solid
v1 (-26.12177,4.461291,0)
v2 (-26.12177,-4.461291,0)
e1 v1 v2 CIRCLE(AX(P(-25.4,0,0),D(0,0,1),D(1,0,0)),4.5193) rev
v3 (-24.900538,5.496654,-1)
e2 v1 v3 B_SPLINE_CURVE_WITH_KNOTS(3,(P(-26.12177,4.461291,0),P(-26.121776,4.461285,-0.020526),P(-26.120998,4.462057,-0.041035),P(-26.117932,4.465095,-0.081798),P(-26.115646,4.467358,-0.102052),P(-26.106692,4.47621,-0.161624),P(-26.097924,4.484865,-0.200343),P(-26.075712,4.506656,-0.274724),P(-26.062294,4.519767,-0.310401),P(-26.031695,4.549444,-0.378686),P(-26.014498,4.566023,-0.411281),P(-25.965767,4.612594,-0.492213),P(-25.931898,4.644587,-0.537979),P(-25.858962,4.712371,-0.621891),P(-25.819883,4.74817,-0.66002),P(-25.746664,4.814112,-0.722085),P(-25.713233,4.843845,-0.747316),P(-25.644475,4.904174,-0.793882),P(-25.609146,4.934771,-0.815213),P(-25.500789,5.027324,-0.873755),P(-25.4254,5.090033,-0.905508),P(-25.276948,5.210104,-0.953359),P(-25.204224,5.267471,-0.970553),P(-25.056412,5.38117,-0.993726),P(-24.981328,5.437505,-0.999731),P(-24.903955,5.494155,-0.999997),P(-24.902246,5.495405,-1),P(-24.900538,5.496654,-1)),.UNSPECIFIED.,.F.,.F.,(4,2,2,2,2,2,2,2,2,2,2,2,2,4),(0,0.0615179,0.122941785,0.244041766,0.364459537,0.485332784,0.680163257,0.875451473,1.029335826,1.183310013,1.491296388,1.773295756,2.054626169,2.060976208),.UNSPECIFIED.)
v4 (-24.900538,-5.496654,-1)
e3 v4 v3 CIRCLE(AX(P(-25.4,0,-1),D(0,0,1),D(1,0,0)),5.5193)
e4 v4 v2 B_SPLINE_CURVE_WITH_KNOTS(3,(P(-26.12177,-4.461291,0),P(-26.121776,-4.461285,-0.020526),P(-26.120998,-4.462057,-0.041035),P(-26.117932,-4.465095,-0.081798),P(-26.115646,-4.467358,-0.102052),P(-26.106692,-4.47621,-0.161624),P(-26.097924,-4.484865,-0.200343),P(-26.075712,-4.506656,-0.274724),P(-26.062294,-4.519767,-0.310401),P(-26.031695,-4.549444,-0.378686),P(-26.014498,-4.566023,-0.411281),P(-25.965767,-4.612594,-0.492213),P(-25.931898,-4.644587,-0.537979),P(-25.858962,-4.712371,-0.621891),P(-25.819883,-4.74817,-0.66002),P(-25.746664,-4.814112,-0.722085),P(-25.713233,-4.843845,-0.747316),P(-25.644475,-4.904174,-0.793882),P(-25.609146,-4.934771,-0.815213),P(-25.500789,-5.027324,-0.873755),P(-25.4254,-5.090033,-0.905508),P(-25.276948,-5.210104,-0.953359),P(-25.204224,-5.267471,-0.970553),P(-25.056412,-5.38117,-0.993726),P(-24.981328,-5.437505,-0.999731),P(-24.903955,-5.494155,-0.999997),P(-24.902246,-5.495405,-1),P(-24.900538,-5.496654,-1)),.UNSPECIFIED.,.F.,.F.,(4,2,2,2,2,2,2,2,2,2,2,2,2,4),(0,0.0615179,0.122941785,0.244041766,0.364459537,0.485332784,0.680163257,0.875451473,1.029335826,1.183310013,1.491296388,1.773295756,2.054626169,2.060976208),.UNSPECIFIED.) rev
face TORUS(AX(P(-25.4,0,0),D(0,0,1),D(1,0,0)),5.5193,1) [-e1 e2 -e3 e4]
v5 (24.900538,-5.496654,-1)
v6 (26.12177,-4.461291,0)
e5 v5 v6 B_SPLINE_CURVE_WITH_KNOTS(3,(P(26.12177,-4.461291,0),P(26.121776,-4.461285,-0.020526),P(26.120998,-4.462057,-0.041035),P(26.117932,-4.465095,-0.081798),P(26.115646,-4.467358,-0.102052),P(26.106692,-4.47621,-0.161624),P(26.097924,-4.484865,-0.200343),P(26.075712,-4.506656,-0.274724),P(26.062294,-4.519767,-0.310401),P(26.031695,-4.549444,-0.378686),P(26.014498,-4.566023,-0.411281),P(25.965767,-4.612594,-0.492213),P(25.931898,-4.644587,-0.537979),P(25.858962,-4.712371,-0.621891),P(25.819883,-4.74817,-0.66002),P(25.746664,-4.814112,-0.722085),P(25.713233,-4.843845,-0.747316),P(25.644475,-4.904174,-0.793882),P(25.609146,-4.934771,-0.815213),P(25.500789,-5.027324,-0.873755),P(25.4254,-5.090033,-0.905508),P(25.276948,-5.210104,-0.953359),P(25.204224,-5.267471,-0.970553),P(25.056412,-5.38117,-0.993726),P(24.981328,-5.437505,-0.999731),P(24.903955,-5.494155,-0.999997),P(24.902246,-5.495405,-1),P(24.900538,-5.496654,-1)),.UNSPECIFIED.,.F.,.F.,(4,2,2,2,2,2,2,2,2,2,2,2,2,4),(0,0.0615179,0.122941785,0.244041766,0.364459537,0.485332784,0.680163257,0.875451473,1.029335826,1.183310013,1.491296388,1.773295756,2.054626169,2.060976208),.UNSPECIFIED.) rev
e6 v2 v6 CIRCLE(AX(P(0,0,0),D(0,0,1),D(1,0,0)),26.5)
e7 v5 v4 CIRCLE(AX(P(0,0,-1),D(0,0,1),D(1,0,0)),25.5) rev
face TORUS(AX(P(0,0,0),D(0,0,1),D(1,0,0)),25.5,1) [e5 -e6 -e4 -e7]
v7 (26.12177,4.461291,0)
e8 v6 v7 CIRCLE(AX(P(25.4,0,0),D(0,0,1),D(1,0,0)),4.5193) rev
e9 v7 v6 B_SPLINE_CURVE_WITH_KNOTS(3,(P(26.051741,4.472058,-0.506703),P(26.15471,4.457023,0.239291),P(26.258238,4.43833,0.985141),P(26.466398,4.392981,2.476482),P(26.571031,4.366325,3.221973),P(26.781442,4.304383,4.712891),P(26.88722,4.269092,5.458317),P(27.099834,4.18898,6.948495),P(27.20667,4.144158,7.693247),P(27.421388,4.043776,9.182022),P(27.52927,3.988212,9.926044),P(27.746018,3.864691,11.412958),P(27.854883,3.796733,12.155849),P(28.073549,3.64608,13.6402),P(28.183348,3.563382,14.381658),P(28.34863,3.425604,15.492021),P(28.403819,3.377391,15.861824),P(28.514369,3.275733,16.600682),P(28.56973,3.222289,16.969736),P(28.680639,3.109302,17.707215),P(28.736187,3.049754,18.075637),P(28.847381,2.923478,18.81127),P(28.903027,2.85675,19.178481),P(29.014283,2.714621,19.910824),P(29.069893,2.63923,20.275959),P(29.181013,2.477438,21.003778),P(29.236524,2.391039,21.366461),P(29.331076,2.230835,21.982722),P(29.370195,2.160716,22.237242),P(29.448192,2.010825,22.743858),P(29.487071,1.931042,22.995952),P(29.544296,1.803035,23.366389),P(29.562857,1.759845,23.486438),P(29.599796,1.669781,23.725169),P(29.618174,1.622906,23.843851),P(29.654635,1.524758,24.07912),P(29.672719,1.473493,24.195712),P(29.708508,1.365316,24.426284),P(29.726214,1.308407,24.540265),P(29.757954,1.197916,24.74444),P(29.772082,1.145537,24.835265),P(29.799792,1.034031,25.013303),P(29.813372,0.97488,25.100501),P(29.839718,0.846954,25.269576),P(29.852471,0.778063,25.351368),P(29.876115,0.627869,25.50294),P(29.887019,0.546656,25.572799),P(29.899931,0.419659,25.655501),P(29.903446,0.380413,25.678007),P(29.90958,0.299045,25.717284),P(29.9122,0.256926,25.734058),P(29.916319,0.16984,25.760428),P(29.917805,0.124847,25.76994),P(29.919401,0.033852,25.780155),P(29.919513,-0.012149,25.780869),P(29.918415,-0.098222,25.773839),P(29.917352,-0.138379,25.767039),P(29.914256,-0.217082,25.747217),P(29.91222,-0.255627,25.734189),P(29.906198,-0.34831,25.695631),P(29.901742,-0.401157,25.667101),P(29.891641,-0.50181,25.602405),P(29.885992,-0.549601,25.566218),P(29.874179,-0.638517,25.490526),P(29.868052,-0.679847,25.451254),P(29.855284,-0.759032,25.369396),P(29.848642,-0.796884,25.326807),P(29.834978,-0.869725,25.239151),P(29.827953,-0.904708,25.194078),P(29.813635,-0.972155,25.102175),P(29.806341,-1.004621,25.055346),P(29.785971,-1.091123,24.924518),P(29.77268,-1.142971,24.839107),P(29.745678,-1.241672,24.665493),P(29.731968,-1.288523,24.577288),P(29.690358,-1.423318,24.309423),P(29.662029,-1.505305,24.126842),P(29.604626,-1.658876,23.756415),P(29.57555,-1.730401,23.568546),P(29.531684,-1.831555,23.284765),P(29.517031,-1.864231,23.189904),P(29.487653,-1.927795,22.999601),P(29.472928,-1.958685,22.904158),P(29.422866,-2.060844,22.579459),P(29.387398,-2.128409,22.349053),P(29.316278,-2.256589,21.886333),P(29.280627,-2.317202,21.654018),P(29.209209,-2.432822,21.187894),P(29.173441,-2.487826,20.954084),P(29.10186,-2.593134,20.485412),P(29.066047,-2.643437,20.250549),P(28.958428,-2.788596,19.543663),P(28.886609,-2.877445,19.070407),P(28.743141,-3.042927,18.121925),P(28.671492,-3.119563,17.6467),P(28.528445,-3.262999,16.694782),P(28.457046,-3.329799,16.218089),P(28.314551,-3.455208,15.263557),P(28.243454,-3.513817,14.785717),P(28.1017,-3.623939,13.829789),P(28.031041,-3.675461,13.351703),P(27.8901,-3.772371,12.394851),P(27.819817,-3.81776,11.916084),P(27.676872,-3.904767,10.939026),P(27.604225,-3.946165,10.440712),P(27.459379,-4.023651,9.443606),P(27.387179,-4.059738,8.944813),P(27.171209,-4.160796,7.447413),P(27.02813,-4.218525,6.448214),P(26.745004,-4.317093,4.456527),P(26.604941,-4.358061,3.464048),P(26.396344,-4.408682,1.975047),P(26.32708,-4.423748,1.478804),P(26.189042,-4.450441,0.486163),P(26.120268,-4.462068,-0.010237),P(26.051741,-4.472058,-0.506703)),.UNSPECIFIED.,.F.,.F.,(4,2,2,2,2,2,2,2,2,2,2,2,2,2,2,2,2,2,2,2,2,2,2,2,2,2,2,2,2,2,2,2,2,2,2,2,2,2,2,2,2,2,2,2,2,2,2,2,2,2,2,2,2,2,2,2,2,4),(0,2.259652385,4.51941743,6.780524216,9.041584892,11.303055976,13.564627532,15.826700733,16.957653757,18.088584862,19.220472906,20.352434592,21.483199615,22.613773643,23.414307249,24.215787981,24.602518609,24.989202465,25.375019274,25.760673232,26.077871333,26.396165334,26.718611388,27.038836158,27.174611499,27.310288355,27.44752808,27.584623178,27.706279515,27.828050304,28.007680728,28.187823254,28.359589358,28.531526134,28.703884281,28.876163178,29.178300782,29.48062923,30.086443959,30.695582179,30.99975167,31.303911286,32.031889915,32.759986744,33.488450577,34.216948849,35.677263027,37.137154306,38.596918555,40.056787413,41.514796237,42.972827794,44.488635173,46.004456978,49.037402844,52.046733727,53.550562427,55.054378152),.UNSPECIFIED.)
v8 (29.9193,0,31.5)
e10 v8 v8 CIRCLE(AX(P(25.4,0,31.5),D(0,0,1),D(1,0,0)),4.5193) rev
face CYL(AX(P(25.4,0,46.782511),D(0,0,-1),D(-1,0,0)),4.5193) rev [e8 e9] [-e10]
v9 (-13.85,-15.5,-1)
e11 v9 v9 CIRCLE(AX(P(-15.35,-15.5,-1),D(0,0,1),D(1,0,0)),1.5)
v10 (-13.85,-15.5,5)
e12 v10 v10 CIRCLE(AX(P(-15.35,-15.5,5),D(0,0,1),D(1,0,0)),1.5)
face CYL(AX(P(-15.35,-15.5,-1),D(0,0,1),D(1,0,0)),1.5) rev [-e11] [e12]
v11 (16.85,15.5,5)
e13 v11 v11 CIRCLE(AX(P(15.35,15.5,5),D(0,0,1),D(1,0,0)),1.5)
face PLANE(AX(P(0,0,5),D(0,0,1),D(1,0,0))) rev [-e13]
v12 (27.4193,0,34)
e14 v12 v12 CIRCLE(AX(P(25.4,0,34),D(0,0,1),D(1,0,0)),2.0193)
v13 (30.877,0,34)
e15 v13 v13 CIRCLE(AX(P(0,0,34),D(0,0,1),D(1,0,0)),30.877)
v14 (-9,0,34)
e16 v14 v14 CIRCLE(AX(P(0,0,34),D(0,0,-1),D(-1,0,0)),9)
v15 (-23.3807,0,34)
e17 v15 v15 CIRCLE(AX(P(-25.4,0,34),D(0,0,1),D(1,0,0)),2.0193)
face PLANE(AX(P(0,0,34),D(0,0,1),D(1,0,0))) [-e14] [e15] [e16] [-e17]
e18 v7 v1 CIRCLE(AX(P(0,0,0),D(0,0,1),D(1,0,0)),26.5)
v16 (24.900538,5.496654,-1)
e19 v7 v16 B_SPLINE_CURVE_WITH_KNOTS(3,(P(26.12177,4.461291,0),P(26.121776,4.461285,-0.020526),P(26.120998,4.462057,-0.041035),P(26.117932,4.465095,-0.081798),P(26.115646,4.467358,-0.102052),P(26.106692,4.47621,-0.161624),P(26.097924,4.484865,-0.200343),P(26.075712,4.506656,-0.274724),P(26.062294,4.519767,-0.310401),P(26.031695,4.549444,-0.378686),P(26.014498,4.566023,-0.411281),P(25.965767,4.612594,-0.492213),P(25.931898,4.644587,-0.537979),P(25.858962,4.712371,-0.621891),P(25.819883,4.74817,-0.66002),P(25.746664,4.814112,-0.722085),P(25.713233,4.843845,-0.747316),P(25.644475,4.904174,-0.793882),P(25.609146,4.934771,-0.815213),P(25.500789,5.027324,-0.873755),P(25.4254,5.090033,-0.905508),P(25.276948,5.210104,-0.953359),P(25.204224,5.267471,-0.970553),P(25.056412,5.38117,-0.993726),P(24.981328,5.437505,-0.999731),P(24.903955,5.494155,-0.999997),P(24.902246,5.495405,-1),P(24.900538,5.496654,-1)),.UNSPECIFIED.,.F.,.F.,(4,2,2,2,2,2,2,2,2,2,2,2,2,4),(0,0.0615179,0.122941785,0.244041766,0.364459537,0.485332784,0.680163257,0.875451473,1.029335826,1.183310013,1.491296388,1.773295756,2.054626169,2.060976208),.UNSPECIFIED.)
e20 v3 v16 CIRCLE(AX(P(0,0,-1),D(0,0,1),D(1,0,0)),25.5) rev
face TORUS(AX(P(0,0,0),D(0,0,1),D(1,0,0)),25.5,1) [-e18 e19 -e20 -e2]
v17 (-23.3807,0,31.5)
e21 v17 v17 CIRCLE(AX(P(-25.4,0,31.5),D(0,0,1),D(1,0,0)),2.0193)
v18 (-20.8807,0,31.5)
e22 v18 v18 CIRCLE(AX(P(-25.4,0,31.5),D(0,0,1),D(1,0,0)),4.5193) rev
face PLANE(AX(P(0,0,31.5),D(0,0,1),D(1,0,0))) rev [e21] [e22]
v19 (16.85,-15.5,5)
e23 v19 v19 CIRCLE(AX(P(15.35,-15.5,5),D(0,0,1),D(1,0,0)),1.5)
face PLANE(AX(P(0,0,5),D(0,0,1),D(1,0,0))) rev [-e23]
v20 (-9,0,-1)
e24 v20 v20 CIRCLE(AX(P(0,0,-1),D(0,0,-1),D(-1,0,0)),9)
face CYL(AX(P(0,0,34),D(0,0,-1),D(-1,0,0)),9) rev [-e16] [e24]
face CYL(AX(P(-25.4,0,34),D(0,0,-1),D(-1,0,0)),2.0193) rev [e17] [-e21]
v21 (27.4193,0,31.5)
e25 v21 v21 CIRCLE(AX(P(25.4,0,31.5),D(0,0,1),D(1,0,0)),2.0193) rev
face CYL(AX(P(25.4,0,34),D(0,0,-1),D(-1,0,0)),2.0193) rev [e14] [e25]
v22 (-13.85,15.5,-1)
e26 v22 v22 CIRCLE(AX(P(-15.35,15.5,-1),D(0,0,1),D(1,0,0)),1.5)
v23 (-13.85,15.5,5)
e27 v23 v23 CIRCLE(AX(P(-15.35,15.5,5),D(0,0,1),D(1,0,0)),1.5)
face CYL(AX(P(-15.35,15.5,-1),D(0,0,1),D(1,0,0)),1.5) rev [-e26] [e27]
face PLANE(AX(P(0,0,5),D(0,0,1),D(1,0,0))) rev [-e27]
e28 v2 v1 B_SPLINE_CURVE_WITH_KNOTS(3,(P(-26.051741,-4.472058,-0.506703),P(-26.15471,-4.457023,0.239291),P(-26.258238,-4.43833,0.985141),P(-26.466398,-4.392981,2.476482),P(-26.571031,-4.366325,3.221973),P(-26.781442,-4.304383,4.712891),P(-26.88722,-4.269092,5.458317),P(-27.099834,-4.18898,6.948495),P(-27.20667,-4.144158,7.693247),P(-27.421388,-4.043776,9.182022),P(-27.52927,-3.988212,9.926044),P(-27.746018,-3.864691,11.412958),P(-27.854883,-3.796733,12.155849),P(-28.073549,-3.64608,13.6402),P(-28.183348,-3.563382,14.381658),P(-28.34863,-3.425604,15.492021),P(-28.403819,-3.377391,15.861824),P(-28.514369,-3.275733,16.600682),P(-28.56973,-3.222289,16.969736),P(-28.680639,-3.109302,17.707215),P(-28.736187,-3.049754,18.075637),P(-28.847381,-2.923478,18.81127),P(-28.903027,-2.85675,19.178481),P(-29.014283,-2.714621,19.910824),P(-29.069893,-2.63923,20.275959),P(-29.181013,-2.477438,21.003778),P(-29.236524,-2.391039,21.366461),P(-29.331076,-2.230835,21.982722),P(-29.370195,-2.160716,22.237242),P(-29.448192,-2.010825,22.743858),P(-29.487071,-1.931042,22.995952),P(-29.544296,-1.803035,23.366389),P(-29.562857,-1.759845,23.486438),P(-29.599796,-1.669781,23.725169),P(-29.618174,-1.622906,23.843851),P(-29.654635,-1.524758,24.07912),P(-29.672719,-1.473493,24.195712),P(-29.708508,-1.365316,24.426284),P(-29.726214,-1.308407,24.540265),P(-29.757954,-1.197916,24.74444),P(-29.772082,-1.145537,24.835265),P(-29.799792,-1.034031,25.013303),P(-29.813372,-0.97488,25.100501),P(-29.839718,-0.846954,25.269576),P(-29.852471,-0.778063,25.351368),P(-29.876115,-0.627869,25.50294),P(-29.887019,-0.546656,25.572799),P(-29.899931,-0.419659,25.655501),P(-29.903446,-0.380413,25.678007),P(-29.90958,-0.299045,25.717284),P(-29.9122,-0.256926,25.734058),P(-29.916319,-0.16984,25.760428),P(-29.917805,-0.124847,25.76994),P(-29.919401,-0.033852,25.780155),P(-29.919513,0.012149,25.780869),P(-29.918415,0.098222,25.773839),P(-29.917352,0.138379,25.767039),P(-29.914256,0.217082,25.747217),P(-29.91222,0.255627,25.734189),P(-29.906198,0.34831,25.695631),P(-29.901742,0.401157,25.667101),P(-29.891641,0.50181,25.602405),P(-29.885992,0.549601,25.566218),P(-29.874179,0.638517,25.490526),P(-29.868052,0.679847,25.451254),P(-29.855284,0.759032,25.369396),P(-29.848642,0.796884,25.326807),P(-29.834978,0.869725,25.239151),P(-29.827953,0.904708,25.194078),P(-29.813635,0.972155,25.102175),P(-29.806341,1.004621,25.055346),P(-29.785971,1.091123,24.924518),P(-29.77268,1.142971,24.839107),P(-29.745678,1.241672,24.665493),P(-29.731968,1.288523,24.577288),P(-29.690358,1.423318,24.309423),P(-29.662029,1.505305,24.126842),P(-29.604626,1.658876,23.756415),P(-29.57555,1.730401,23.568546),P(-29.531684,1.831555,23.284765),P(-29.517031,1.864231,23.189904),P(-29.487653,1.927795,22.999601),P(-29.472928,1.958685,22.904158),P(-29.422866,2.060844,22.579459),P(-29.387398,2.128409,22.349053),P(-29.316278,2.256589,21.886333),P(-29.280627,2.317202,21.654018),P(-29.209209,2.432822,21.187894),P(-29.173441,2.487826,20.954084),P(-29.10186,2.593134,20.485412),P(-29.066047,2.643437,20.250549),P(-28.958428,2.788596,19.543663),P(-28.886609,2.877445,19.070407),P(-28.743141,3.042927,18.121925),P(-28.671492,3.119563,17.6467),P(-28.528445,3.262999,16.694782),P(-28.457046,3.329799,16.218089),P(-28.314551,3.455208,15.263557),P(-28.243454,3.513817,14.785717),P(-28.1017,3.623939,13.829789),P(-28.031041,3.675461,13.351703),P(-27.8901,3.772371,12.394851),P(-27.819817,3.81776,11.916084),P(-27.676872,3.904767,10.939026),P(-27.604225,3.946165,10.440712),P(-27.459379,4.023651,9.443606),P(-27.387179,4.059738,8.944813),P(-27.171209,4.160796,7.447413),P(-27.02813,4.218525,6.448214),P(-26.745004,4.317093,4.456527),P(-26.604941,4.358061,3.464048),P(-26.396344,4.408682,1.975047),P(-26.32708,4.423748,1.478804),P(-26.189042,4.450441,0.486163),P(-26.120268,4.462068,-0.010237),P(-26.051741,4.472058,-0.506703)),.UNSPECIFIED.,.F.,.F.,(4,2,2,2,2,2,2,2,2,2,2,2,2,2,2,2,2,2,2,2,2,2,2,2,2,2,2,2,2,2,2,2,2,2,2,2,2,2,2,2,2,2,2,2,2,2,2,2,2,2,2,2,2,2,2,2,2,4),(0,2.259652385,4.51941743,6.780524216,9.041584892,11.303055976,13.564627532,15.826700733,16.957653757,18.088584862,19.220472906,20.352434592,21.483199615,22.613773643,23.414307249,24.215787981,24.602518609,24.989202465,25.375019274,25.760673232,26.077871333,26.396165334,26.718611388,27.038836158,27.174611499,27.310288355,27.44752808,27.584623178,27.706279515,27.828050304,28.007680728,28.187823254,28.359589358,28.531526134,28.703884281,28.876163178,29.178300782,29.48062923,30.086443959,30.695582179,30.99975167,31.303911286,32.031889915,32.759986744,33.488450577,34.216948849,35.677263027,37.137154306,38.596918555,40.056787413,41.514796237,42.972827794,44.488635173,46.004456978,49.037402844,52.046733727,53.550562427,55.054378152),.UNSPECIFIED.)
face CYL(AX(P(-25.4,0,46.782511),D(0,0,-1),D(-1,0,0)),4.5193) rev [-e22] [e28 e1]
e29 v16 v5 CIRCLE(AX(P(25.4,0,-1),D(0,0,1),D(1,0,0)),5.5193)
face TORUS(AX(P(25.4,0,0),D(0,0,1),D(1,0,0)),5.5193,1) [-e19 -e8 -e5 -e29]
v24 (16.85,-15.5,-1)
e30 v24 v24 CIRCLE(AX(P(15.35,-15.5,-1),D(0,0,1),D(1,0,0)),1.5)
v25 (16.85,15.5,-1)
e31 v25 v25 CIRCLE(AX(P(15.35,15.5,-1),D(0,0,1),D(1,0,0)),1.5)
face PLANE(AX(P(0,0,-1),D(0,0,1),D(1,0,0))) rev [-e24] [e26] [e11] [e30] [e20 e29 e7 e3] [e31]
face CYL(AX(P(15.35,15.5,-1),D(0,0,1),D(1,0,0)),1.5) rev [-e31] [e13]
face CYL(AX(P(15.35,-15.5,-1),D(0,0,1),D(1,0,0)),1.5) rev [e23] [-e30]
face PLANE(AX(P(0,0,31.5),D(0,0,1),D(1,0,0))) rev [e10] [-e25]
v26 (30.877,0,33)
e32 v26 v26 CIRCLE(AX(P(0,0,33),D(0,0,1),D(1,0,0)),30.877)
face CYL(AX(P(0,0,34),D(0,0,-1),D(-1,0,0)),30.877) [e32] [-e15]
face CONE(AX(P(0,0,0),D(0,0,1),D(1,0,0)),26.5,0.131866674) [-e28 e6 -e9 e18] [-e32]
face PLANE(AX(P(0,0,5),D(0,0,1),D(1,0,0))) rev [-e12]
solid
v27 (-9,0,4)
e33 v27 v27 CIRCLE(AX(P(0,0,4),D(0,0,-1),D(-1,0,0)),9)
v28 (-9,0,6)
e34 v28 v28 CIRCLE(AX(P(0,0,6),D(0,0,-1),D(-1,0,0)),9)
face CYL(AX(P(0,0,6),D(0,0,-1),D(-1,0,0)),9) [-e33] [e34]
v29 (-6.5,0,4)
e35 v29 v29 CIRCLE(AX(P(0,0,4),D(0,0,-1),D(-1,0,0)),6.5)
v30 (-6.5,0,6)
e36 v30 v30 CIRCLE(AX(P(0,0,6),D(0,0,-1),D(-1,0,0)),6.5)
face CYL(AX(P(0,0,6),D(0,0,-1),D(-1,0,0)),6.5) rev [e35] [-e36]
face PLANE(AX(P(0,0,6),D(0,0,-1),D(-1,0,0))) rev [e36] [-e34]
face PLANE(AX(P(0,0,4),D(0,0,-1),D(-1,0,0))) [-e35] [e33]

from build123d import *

# Parameters (mm, degrees)
SKETCH1_R           = 26.5
SKETCH1_R_2         = 1.5
BOSS_EXTRUDE1_DEPTH = 1
SKETCH2_R           = 30.877
BOSS_EXTRUDE2_DEPTH = 1
CUT_EXTRUDE1_START  = 5
SKETCH1_5_R         = 1.5
CUT_EXTRUDE1_DEPTH  = 5
CUT_EXTRUDE2_DEPTH  = 56.34237319
CUT_EXTRUDE3_DEPTH  = 32.5
SKETCH4_R           = 9
CUT_EXTRUDE4_DEPTH  = 56.962293291
FILLET1_R           = 1
BOSS_EXTRUDE3_START = -5
SKETCH5_R           = 9
SKETCH5_R_2         = 6.5
BOSS_EXTRUDE3_DEPTH = 2


with BuildPart() as part:
    # Sketch1 → Boss-Extrude1 (new body)
    with BuildSketch(Plane.XY):
        Circle(SKETCH1_R)
        with Locations((-15.35, -15.5)):
            Circle(SKETCH1_R_2, mode=Mode.SUBTRACT)
        with Locations((15.35, -15.5)):
            Circle(SKETCH1_R_2, mode=Mode.SUBTRACT)
        with Locations((15.35, 15.5)):
            Circle(SKETCH1_R_2, mode=Mode.SUBTRACT)
        with Locations((-15.35, 15.5)):
            Circle(SKETCH1_R_2, mode=Mode.SUBTRACT)
    extrude(amount=-BOSS_EXTRUDE1_DEPTH)



with BuildPart() as body_2:
    # Sketch2 → Boss-Extrude2 (new body)
    with BuildSketch(Plane.XY.offset(33)):
        Circle(SKETCH2_R)
        with BuildLine():
            ThreePointArc((27.4193, 0), (25.4, 2.0193), (23.3807, 0))
            ThreePointArc((23.3807, 0), (25.4, -2.0193), (27.4193, 0))
        make_face(mode=Mode.SUBTRACT)
        with BuildLine():
            ThreePointArc((-23.3807, 0), (-25.4, 2.0193), (-27.4193, 0))
            ThreePointArc((-27.4193, 0), (-25.4, -2.0193), (-23.3807, 0))
        make_face(mode=Mode.SUBTRACT)
    extrude(amount=BOSS_EXTRUDE2_DEPTH)


with BuildPart() as part_1:
    add(part.part)

    add(body_2.part)  # loft1 joins it to this body
    # loft up to a face of the part (loft1)
    loft([Face(Wire([part_1.edges().sort_by_distance((-18.140498307, 19.317668627, 0))[0]])), Face(Wire([part_1.edges().sort_by_distance((-21.13676099, -22.508364309, 33))[0]]))])

    # Sketch1<5> → Cut-Extrude1 (cut)
    with BuildSketch(Plane.XY.offset(CUT_EXTRUDE1_START)):
        with Locations((15.35, 15.5)):
            Circle(SKETCH1_5_R)
        with Locations((-15.35, 15.5)):
            Circle(SKETCH1_5_R)
        with Locations((-15.35, -15.5)):
            Circle(SKETCH1_5_R)
        with Locations((15.35, -15.5)):
            Circle(SKETCH1_5_R)
    extrude(amount=-CUT_EXTRUDE1_DEPTH, mode=Mode.SUBTRACT)

    # Sketch2<6> → Cut-Extrude2 (cut, through all)
    with BuildSketch(Plane.XY.offset(33)):
        with BuildLine():
            ThreePointArc((27.4193, 0), (25.4, 2.0193), (23.3807, 0))
            ThreePointArc((23.3807, 0), (25.4, -2.0193), (27.4193, 0))
        make_face()
        with BuildLine():
            ThreePointArc((-23.3807, 0), (-25.4, 2.0193), (-27.4193, 0))
            ThreePointArc((-27.4193, 0), (-25.4, -2.0193), (-23.3807, 0))
        make_face()
    extrude(amount=-CUT_EXTRUDE2_DEPTH, mode=Mode.SUBTRACT)

    # Sketch3 → Cut-Extrude3 (cut)
    # profile 1 of 2: a face of its own
    with BuildSketch(Plane(origin=(0, 0, -1), x_dir=(-1, 0, 0), z_dir=(0, 0, -1))):
        with BuildLine():
            ThreePointArc((-27.735523845, -3.869030998), (-20.8807, 0), (-27.735523845, 3.869030998))
            ThreePointArc((-27.735523845, 3.869030998), (-29.9193, 0), (-27.735523845, -3.869030998))
        make_face()
        with BuildLine():
            ThreePointArc((-26.443551723, 1.728748765), (-27.4193, 0), (-26.443551723, -1.728748765))
            ThreePointArc((-26.443551723, -1.728748765), (-23.3807, 0), (-26.443551723, 1.728748765))
        make_face(mode=Mode.SUBTRACT)
    # profile 2 of 2: a face of its own
    with BuildSketch(Plane(origin=(0, 0, -1), x_dir=(-1, 0, 0), z_dir=(0, 0, -1))):
        with BuildLine():
            ThreePointArc((27.735523845, -3.869030998), (20.8807, 0), (27.735523845, 3.869030998))
            ThreePointArc((27.735523845, 3.869030998), (29.9193, 0), (27.735523845, -3.869030998))
        make_face()
    extrude(amount=-CUT_EXTRUDE3_DEPTH, mode=Mode.SUBTRACT)

    # Sketch4 → Cut-Extrude4 (cut, through all)
    with BuildSketch(Plane(origin=(0, 0, -1), x_dir=(-1, 0, 0), z_dir=(0, 0, -1))):
        Circle(SKETCH4_R)
    extrude(amount=-CUT_EXTRUDE4_DEPTH, mode=Mode.SUBTRACT)

    # Fillet1
    fillet1_edges = [part_1.edges().sort_by_distance(p)[0] for p in [
        (-20.8807, 0, -1),
        (0, 26.5, -1),
        (0, -26.5, -1),
        (20.8807, 0, -1),
    ]]
    fillet(fillet1_edges, radius=FILLET1_R - 0.0001)  # a hair under: the kernel refuses the full size


with BuildPart() as body_2_2:
    # Sketch5 → Boss-Extrude3 (new body)
    with BuildSketch(Plane(origin=(0, 0, -1), x_dir=(-1, 0, 0), z_dir=(0, 0, -1)).offset(BOSS_EXTRUDE3_START)):
        Circle(SKETCH5_R)
        Circle(SKETCH5_R_2, mode=Mode.SUBTRACT)
    extrude(amount=-BOSS_EXTRUDE3_DEPTH)


solid = Compound([part_1.part, body_2_2.part])
